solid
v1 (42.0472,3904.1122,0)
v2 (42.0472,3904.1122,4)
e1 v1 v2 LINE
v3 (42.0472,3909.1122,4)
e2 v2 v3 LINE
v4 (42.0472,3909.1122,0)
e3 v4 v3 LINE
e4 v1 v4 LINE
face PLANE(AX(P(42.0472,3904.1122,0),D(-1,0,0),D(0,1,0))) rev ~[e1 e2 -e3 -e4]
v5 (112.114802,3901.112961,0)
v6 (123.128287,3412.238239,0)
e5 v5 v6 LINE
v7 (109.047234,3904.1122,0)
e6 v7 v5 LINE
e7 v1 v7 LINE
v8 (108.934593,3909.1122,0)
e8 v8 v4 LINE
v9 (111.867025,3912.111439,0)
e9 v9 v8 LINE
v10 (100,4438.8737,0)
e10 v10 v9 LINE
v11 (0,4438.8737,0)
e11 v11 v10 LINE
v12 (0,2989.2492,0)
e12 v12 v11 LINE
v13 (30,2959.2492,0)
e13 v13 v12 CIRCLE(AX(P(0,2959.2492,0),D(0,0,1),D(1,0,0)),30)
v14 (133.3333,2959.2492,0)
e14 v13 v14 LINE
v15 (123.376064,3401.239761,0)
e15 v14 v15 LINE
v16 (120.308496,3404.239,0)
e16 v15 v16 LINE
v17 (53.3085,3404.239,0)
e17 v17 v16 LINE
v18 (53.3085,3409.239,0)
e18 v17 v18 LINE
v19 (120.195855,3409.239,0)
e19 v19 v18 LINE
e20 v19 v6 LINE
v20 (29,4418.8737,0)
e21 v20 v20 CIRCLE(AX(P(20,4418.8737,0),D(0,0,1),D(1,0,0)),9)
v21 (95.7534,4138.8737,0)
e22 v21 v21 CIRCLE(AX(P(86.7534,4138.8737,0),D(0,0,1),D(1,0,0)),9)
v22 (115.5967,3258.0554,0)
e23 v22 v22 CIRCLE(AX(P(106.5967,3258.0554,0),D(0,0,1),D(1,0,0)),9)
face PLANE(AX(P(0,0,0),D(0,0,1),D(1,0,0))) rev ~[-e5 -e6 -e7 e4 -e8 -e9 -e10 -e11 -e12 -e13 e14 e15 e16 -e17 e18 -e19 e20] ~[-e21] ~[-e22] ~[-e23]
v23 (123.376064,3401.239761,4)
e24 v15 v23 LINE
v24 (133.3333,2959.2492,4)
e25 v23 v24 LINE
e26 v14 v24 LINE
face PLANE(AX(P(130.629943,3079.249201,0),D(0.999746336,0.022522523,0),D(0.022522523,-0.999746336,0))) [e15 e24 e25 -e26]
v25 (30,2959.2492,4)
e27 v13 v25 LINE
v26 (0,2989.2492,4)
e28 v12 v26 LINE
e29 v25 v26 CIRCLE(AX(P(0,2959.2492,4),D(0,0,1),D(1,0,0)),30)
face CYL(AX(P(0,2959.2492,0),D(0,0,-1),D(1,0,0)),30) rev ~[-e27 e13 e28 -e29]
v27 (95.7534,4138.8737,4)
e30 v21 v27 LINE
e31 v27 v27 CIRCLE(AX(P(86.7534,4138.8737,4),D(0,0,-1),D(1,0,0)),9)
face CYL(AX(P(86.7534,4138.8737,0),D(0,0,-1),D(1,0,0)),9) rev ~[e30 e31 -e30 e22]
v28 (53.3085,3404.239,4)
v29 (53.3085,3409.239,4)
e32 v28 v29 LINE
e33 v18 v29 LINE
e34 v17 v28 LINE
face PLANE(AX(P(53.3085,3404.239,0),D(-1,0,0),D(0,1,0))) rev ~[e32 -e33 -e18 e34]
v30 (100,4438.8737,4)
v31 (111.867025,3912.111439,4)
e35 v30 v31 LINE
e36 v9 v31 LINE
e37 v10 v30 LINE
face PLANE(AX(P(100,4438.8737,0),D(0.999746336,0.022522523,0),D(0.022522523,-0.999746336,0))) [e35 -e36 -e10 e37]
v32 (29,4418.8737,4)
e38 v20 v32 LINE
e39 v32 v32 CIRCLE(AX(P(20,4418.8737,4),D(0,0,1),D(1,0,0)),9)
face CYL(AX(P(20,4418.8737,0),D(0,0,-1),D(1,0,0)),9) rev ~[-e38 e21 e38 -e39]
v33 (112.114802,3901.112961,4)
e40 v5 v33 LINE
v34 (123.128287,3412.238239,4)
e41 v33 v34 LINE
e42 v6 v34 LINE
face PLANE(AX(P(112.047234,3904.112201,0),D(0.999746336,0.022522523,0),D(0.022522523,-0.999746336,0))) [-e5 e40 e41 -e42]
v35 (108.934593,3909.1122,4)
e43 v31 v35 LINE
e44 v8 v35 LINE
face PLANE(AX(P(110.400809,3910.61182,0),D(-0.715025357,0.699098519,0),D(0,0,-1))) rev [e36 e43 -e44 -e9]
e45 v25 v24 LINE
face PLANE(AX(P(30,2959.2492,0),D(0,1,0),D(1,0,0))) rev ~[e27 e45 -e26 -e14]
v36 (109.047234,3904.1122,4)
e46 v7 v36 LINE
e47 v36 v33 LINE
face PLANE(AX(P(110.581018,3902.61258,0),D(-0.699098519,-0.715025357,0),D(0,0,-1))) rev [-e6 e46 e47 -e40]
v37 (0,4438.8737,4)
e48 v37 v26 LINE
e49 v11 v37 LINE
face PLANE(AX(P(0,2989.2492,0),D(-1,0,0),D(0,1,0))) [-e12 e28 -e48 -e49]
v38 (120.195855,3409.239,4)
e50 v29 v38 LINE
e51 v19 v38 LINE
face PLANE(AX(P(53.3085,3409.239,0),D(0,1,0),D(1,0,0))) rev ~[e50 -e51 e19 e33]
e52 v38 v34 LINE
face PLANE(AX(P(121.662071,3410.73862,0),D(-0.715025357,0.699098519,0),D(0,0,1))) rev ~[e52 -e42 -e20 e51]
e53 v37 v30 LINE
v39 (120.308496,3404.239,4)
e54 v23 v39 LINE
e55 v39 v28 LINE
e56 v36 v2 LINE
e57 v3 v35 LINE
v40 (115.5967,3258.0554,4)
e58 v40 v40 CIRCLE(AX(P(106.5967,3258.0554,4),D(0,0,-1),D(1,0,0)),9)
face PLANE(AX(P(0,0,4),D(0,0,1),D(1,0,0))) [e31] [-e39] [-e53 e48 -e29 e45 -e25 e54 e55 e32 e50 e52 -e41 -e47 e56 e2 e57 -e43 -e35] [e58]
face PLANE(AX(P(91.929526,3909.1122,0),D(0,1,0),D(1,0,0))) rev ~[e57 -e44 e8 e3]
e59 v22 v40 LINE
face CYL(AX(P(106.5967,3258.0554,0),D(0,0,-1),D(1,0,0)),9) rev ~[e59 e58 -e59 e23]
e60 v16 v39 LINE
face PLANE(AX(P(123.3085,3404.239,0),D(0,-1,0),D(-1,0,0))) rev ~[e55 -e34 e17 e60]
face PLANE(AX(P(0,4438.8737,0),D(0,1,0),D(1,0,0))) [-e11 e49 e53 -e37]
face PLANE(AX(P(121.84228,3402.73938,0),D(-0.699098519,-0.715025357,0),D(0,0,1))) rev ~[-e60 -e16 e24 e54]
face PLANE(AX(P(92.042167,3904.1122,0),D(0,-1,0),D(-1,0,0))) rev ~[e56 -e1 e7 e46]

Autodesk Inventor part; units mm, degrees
ref_plane "YZ Plane" through (0, 0, 0) normal (1, 0, 0) x (0, 1, 0)
ref_plane "XZ Plane" through (0, 0, 0) normal (0, 1, 0) x (-1, 0, 0)
ref_plane "XY Plane" through (0, 0, 0) normal (0, 0, 1) x (1, 0, 0)
sketch "Sketch1" plane through (0, 0, 0) normal (0, 0, 1) x (1, 0, 0)
  line L0 (0, 0) -> (0, 4438.8737)
  line L1 (0, 4438.8737) -> (100, 4438.8737)
  line L2 (100, 4438.8737) -> (200, 0)
  line L3 (200, 0) -> (0, 0)
  circle A0 centre (0, 0) radius 30
  line L4 (0, 1479.6246) -> (166.6667, 1479.6246)
  line L5 (0, 2959.2492) -> (133.3333, 2959.2492)
  circle A1 centre (0, 1479.6246) radius 30
  circle A2 centre (0, 2959.2492) radius 30
  line L6 (190.8761, 405) -> (120.8761, 405)
  line L7 (120.8761, 405) -> (120.8761, 410)
  line L8 (120.8761, 410) -> (190.8761, 410)
  line L9 (190.8761, 410) -> (190.8761, 405)
  line L10 (109.6148, 909.8732) -> (179.6148, 909.8732)
  line L11 (179.6148, 904.8732) -> (109.6148, 904.8732)
  line L12 (109.6148, 904.8732) -> (109.6148, 909.8732)
  line L13 (179.6148, 909.8732) -> (179.6148, 904.8732)
  line L14 (98.3535, 1409.7463) -> (168.3535, 1409.7463)
  line L15 (168.3535, 1404.7463) -> (98.3535, 1404.7463)
  line L16 (98.3535, 1404.7463) -> (98.3535, 1409.7463)
  line L17 (168.3535, 1409.7463) -> (168.3535, 1404.7463)
  line L18 (87.0923, 1909.6195) -> (157.0923, 1909.6195)
  line L19 (157.0923, 1904.6195) -> (87.0923, 1904.6195)
  line L20 (87.0923, 1904.6195) -> (87.0923, 1909.6195)
  line L21 (157.0923, 1909.6195) -> (157.0923, 1904.6195)
  line L22 (75.831, 2409.4927) -> (145.831, 2409.4927)
  line L23 (145.831, 2404.4927) -> (75.831, 2404.4927)
  line L24 (75.831, 2404.4927) -> (75.831, 2409.4927)
  line L25 (145.831, 2409.4927) -> (145.831, 2404.4927)
  line L26 (64.5698, 2909.3658) -> (134.5698, 2909.3658)
  line L27 (134.5698, 2904.3658) -> (64.5698, 2904.3658)
  line L28 (64.5698, 2904.3658) -> (64.5698, 2909.3658)
  line L29 (134.5698, 2909.3658) -> (134.5698, 2904.3658)
  line L30 (53.3085, 3409.239) -> (123.3085, 3409.239)
  line L31 (123.3085, 3404.239) -> (53.3085, 3404.239)
  line L32 (53.3085, 3404.239) -> (53.3085, 3409.239)
  line L33 (123.3085, 3409.239) -> (123.3085, 3404.239)
  line L34 (42.0472, 3909.1122) -> (112.0472, 3909.1122)
  line L35 (112.0472, 3904.1122) -> (42.0472, 3904.1122)
  line L36 (42.0472, 3904.1122) -> (42.0472, 3909.1122)
  line L37 (112.0472, 3909.1122) -> (112.0472, 3904.1122)
  line L38 (0, 1629.6246) -> (163.2874, 1629.6246)
  line L39 (0, 3079.2492) -> (130.6299, 3079.2492)
  circle A3 centre (20, 4418.8737) radius 9
  circle A4 centre (106.5967, 3258.0554) radius 9
  circle A5 centre (86.7534, 4138.8737) radius 9
  line L40 (86.7534, 4138.8737) -> (106.5967, 3258.0554)
  point P0 (30, 2959.2492)
  point P1 (0, 2929.2492)
  point P2 (0, 1509.6246)
  point P3 (0, 1449.6246)
  point P4 (0, 30)
  point P5 (30, 0)
  point P6 (190.7634, 410)
  point P7 (179.5022, 909.8732)
  point P8 (168.3535, 1404.7463)
  point P9 (168.2409, 1409.7463)
  point P10 (30, 1479.6246)
  point P11 (157.0923, 1904.6195)
  point P12 (156.9796, 1909.6195)
  point P13 (145.831, 2404.4927)
  point P14 (145.7184, 2409.4927)
  point P15 (134.5698, 2904.3658)
  point P16 (134.4571, 2909.3658)
  point P17 (0, 2989.2492)
  point P18 (123.3085, 3404.239)
  point P19 (123.1959, 3409.239)
  point P20 (112.0472, 3904.1122)
  point P21 (111.9346, 3909.1122)
  dimension "d65" = 100
  dimension "d67" = 200
  dimension "d68" = 60
  dimension "d69" = 1480
  dimension "d70" = 1480
  dimension "d71" = 1480
  dimension "d72" = 5
  dimension "d73" = 70
  dimension "d74" = 410
  dimension "d77" = 500
  dimension "d82" = 120
  dimension "d83" = 150
  dimension "d88" = 18
  dimension "d91" = 20
  dimension "d92" = 20
  dimension "d93" = 20
  dimension "d94" = 300
  dimension "d95" = 300
extrude "Plate3" add sketch "Sketch1" along normal blind 4 contours L39 L2 L5 A2 L0 | L0 L1 L2 L34 L36 L35 L40 L30 L32 L31 L39 | L30 L40 L35 L2
chamfer "Corner Chamfer2" distance 3 angle 45 4 edges at (123.3085, 3404.239, 2) (123.1959, 3409.239, 2) (112.0472, 3904.1122, 2) (111.9346, 3909.1122, 2)
equation "\"BendRadius\" = Thickness"
equation "\"BendReliefWidth\" = Thickness"
equation "\"BendReliefDepth\" = 0.5 * Thickness"
equation "\"CornerReliefSize\" = 4 * Thickness"
equation "\"MinimumRemnant\" = 2 * Thickness"
equation "\"TransitionRadius\" = BendRadius"
equation "\"JacobiRadiusSize\" = BendRadius"
equation "\"GapSize\" = Thickness"
equation "\"Thickness\" = 4"
properties part number "GBK 3311 central third rib" material "Steel"
